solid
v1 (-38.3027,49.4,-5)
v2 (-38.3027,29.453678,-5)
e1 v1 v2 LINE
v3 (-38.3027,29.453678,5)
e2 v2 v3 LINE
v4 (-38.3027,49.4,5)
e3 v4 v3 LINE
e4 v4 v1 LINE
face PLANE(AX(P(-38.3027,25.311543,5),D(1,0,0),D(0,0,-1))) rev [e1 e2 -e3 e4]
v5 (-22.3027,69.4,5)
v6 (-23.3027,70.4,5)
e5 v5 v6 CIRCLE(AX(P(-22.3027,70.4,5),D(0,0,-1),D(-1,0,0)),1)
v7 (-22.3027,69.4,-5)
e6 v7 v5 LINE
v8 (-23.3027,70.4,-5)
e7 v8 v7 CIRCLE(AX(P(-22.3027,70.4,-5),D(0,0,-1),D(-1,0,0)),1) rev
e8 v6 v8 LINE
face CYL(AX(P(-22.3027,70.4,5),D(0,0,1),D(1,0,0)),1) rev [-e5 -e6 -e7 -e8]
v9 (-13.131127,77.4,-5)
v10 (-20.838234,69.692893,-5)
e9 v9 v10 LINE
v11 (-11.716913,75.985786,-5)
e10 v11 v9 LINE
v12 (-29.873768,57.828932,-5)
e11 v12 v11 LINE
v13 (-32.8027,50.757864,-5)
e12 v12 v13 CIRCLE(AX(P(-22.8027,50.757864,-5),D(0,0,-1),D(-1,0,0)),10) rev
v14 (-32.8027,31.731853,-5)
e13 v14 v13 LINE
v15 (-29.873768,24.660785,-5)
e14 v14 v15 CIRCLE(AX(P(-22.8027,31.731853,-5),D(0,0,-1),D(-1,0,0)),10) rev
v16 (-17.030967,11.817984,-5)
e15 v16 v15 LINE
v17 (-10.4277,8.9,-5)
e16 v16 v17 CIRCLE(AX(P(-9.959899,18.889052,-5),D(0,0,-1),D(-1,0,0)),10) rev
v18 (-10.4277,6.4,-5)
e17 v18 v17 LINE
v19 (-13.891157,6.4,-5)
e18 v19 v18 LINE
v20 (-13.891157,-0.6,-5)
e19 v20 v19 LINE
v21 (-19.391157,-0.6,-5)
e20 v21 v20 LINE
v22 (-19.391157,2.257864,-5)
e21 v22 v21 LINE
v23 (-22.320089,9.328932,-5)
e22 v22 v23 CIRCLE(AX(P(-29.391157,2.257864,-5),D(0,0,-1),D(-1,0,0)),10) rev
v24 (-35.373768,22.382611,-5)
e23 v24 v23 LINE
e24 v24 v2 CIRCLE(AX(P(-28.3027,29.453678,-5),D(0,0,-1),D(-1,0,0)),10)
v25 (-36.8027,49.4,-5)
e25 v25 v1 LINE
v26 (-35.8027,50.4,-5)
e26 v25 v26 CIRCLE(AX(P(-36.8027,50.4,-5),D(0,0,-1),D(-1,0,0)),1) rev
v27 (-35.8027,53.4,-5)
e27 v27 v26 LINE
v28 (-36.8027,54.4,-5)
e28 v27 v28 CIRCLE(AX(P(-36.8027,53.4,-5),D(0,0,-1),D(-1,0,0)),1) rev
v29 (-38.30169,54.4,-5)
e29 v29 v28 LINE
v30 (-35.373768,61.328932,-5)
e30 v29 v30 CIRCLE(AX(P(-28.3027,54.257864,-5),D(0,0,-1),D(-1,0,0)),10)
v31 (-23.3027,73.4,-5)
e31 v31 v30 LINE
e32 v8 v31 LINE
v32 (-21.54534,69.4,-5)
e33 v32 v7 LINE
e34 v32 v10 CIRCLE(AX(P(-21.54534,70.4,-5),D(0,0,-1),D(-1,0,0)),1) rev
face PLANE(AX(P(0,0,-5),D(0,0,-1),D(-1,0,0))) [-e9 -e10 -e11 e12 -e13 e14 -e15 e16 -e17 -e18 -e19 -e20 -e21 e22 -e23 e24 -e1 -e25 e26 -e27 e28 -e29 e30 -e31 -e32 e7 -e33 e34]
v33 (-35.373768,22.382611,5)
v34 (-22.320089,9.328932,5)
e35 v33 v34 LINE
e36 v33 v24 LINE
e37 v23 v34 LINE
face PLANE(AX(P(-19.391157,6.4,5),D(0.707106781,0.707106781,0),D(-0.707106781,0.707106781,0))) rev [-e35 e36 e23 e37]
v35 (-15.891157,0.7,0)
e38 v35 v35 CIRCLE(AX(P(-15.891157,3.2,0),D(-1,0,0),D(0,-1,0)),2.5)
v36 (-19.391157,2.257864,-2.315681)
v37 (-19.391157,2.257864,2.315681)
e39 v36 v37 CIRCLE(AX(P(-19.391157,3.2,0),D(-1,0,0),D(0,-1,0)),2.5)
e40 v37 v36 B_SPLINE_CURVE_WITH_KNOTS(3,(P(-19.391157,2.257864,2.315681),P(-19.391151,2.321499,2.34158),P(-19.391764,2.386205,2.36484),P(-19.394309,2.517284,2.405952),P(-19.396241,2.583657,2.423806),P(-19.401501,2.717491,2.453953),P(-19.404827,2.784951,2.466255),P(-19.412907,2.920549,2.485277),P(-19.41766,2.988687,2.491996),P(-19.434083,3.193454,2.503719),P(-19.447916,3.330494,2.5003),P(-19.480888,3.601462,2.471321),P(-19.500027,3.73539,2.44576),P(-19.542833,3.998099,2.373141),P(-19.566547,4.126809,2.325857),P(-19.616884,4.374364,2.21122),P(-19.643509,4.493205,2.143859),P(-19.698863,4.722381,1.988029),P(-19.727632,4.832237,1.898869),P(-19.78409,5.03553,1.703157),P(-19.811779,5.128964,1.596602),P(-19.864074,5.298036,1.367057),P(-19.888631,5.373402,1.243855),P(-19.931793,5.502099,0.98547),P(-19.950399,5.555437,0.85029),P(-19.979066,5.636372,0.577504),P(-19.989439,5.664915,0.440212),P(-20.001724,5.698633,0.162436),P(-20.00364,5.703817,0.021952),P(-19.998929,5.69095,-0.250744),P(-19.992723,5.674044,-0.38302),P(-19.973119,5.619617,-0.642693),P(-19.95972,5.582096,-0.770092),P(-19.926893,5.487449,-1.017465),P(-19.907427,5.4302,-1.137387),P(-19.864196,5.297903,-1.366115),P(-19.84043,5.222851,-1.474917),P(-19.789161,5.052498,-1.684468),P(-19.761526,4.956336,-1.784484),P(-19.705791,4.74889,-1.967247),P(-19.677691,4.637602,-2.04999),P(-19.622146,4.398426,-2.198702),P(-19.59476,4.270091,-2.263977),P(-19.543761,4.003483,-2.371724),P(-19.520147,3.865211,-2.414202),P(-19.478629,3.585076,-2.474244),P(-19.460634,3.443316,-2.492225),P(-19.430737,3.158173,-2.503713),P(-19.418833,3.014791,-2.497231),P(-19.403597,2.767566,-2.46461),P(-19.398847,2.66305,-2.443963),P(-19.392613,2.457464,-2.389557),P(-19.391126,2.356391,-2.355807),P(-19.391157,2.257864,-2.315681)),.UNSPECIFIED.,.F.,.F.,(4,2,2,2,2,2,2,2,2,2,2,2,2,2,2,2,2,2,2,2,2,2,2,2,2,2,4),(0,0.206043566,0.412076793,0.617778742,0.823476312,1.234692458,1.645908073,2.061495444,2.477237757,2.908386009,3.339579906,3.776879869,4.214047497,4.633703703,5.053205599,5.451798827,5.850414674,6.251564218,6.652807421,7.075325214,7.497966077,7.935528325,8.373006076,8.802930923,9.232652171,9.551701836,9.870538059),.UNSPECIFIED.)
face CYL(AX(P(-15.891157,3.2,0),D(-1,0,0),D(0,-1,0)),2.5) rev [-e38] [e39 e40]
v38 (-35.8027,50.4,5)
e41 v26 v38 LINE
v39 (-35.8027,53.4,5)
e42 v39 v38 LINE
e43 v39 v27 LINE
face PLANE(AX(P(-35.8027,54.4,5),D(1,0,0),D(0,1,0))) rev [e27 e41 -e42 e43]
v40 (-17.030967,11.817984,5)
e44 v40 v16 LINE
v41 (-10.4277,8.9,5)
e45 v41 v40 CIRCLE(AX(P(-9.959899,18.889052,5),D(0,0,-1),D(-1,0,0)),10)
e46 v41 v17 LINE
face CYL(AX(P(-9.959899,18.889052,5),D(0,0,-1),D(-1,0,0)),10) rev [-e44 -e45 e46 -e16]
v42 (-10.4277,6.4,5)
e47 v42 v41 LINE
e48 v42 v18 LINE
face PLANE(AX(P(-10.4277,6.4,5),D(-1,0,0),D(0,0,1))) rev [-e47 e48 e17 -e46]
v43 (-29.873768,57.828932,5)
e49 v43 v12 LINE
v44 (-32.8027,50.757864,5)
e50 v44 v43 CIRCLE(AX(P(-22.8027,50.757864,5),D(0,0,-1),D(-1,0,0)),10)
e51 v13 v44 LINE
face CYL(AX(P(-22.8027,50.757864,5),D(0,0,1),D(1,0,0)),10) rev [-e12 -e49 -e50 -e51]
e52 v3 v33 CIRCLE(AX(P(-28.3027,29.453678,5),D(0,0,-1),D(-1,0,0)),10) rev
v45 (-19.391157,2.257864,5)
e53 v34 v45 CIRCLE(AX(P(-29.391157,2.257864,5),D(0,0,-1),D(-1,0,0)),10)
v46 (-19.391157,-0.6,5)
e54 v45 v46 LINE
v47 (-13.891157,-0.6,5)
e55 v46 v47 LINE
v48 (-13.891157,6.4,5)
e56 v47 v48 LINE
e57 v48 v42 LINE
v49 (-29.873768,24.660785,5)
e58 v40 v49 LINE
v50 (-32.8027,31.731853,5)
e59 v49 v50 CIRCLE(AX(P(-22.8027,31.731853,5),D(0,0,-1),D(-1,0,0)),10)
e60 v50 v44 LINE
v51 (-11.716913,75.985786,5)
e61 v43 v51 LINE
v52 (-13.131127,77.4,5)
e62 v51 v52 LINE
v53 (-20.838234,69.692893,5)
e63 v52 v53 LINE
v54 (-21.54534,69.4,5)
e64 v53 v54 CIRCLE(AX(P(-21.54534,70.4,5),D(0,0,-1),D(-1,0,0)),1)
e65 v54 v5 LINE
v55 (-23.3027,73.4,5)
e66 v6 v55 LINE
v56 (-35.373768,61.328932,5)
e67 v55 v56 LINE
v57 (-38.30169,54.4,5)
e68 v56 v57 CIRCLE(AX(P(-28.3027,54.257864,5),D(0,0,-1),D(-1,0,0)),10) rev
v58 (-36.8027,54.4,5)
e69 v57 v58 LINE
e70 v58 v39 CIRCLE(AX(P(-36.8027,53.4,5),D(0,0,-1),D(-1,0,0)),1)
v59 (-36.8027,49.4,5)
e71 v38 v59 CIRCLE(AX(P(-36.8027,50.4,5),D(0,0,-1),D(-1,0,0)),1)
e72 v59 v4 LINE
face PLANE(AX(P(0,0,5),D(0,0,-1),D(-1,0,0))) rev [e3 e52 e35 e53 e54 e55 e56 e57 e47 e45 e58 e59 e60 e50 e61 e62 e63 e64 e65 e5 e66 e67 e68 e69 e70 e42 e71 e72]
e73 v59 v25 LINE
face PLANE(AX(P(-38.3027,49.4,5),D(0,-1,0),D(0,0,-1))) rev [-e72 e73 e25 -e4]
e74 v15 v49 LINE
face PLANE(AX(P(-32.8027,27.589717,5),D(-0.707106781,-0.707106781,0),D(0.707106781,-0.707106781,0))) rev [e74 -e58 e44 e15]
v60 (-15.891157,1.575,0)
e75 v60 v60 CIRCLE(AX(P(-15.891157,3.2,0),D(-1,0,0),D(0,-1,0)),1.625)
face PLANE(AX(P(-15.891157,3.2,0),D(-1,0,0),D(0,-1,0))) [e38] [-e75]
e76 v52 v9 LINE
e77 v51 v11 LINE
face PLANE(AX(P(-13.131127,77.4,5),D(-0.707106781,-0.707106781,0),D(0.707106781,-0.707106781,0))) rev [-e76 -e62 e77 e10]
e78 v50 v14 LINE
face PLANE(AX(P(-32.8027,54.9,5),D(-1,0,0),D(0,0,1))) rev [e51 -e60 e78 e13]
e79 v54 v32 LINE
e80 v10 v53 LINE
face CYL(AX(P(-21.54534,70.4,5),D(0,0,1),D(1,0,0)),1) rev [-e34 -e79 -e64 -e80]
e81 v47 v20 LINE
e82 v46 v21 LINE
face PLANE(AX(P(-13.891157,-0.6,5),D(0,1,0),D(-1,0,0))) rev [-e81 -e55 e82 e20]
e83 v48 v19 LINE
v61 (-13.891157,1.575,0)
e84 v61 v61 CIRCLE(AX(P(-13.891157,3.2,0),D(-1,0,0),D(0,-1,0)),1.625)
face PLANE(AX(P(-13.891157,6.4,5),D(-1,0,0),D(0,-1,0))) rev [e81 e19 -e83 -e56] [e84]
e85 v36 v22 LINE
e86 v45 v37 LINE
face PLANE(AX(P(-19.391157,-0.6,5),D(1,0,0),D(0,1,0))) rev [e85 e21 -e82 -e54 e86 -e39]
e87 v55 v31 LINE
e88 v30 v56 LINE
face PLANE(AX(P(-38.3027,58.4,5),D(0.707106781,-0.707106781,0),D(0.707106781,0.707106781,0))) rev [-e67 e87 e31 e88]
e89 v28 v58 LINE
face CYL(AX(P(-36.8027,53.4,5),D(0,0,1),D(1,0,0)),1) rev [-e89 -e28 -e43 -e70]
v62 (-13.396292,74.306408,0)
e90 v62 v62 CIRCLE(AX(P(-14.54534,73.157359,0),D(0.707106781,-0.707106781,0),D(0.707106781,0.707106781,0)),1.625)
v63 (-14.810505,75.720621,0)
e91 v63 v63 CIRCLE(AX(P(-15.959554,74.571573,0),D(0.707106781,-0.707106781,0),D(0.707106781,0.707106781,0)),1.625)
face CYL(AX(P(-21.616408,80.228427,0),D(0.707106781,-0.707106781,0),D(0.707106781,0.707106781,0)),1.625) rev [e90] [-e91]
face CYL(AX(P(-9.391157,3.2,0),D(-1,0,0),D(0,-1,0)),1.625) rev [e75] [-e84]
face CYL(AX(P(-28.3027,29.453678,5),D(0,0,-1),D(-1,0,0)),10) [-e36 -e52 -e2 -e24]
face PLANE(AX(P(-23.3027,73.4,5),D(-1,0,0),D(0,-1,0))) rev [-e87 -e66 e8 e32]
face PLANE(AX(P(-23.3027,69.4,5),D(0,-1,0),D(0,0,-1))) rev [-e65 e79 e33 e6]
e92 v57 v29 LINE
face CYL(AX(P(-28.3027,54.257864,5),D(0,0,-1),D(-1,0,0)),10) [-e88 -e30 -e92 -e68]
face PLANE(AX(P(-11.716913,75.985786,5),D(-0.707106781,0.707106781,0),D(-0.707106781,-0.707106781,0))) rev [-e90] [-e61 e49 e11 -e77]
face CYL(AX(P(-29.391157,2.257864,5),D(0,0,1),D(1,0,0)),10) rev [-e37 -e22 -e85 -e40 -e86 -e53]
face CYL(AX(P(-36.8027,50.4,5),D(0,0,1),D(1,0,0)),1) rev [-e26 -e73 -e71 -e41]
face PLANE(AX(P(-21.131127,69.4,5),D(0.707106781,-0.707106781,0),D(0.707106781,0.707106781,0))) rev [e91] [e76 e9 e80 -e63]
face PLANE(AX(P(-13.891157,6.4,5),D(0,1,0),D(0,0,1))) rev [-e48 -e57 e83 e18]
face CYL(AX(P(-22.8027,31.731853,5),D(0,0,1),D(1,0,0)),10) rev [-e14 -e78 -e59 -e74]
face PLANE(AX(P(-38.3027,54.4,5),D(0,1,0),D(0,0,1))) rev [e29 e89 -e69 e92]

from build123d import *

# Parameters (mm, degrees)
ESTRUSIONE_ESTRUSIONE1_DEPTH = 5
SCHIZZO2_R                   = 2.5
TAGLIO_ESTRUSIONE2_DEPTH     = 3.5
SCHIZZO3_R                   = 1.625
TAGLIO_ESTRUSIONE3_DEPTH     = 10
RACCORDO1_R                  = 10
SCHIZZO4_W                   = 2.5
SCHIZZO4_H                   = 5
TAGLIO_ESTRUSIONE4_DEPTH     = 10
RACCORDO2_R                  = 1
SCHIZZO5_R                   = 1.625
TAGLIO_ESTRUSIONE5_DEPTH     = 10


with BuildPart() as part:
    # Schizzo1 → Estrusione-Estrusione1 (new, symmetric)
    with BuildSketch(Plane.XY):
        Polygon((-13.891157033, -0.6), (-19.391157033, -0.6), (-19.391157033, 6.4), (-38.302699765, 25.311542732), (-38.302699765, 58.4), (-23.302699765, 73.4), (-23.302699765, 69.4), (-21.131126889, 69.4), (-13.131126889, 77.4), (-11.716913327, 75.985786438), (-32.802699765, 54.9), (-32.802699765, 27.589717325), (-14.11298244, 8.9), (-10.427699765, 8.9), (-10.427699765, 6.4), (-13.891157033, 6.4), align=None)
    extrude(amount=ESTRUSIONE_ESTRUSIONE1_DEPTH, both=True)

    # Schizzo2 → Taglio-Estrusione2 (cut)
    with BuildSketch(Plane.ZY.offset(19.391157033)):
        with Locations(Location((0, 3.2, 0), (0, 0, 270))):
            Circle(SCHIZZO2_R)
    extrude(amount=-TAGLIO_ESTRUSIONE2_DEPTH, mode=Mode.SUBTRACT)

    # Schizzo3 → Taglio-Estrusione3 (cut)
    with BuildSketch(Plane.ZY.offset(19.391157033)):
        with Locations(Location((0, 3.2, 0), (0, 0, 270))):
            Circle(SCHIZZO3_R)
    extrude(amount=-TAGLIO_ESTRUSIONE3_DEPTH, mode=Mode.SUBTRACT)

    # Raccordo1
    # the kernel refuses this fillet: 10 mm, written as the material it adds along each edge
    with BuildSketch(Plane(origin=(-19.391157033, 6.4, 5), x_dir=(0, -1, 0), z_dir=(0, 0, -1))) as raccordo1_piece_1_section:
        with BuildLine():
            CenterArc((RACCORDO1_R * 0.414213562373, RACCORDO1_R), RACCORDO1_R, 225, 45)
            Line((-RACCORDO1_R * 0.292893218813, RACCORDO1_R * 0.292893218813), (0, 0))
            Line((0, 0), (RACCORDO1_R * 0.414213562373, 0))
        make_face()
    raccordo1_piece_1 = extrude(amount=10, mode=Mode.PRIVATE)
    raccordo1_piece_1 = raccordo1_piece_1 - Plane(origin=(-19.391157033, 3.2, 0), x_dir=(0, -1, 0), z_dir=(-1, 0, 0)) * Cylinder(2.5, 37, mode=Mode.PRIVATE)
    add(raccordo1_piece_1)
    with BuildSketch(Plane(origin=(-14.11298244, 8.9, 5), x_dir=(-0.7071067811865495, 0.7071067811865456, 0), z_dir=(0, 0, -1))) as raccordo1_piece_2:
        with BuildLine():
            CenterArc((4.126652993, 10), RACCORDO1_R, 227.681279823, 42.318720177)
            Line((-2.60588837, 2.60588837), (0, 0))
            Line((0, 0), (4.126652993, 0))
        make_face()
    extrude(amount=10)
    with BuildSketch(Plane(origin=(-32.802699765, 27.589717325, 5), x_dir=(0, 1, 0), z_dir=(0, 0, -1)), Plane(origin=(-32.802699765, 54.9, 5), x_dir=(0.7071067811865458, 0.7071067811865492, 0), z_dir=(0, 0, -1))) as raccordo1_piece_3:
        with BuildLine():
            CenterArc((RACCORDO1_R * 0.414213562373, RACCORDO1_R), RACCORDO1_R, 225, 45)
            Line((-RACCORDO1_R * 0.292893218813, RACCORDO1_R * 0.292893218813), (0, 0))
            Line((0, 0), (RACCORDO1_R * 0.414213562373, 0))
        make_face()
    extrude(amount=10)
    # the kernel refuses this fillet: 10 mm, written as the material it takes off along each edge
    with BuildSketch(Plane(origin=(-38.302699765, 25.311542732, 15.355339059), x_dir=(0.7071067811865497, -0.7071067811865454, 0), z_dir=(0, 0, -1)), Plane(origin=(-38.302699765, 58.4, 15.355339059), x_dir=(0, -1, 0), z_dir=(0, 0, -1))) as raccordo1_2_piece_1:
        with BuildLine():
            CenterArc((RACCORDO1_R * 0.414213562373, -RACCORDO1_R), RACCORDO1_R, 90, 45)
            Line((-RACCORDO1_R * 0.292893218813, -RACCORDO1_R * 0.292893218813), (0, 0))
            Line((0, 0), (RACCORDO1_R * 0.414213562373, 0))
        make_face()
    extrude(amount=30.710678119, mode=Mode.SUBTRACT)

    # Schizzo4 → Taglio-Estrusione4 (cut)
    with BuildSketch(Plane(origin=(0, 0, -5), x_dir=(-1, 0, 0), z_dir=(0, 0, -1))):
        with Locations((37.052699765, 51.9)):
            Rectangle(SCHIZZO4_W, SCHIZZO4_H)
    extrude(amount=-TAGLIO_ESTRUSIONE4_DEPTH, mode=Mode.SUBTRACT)

    # Raccordo2
    raccordo2_edges = [part.edges().sort_by_distance(p)[0] for p in [
        (-35.802699765, 49.4, 0),
        (-35.802699765, 54.4, 0),
        (-23.302699765, 69.4, 0),
        (-21.131126889, 69.4, 0),
    ]]
    fillet(raccordo2_edges, radius=RACCORDO2_R)

    # Schizzo5 → Taglio-Estrusione5 (cut)
    with BuildSketch(Plane(origin=(-43.851349882, 43.851349882, 0), x_dir=(0, 0, -1), z_dir=(0.707106781186549, -0.707106781186546, 0))):
        with Locations(Location((0, 41.444955996, 0), (0, 0, 90))):
            Circle(SCHIZZO5_R)
    extrude(amount=-TAGLIO_ESTRUSIONE5_DEPTH, mode=Mode.SUBTRACT)


solid = part.part
